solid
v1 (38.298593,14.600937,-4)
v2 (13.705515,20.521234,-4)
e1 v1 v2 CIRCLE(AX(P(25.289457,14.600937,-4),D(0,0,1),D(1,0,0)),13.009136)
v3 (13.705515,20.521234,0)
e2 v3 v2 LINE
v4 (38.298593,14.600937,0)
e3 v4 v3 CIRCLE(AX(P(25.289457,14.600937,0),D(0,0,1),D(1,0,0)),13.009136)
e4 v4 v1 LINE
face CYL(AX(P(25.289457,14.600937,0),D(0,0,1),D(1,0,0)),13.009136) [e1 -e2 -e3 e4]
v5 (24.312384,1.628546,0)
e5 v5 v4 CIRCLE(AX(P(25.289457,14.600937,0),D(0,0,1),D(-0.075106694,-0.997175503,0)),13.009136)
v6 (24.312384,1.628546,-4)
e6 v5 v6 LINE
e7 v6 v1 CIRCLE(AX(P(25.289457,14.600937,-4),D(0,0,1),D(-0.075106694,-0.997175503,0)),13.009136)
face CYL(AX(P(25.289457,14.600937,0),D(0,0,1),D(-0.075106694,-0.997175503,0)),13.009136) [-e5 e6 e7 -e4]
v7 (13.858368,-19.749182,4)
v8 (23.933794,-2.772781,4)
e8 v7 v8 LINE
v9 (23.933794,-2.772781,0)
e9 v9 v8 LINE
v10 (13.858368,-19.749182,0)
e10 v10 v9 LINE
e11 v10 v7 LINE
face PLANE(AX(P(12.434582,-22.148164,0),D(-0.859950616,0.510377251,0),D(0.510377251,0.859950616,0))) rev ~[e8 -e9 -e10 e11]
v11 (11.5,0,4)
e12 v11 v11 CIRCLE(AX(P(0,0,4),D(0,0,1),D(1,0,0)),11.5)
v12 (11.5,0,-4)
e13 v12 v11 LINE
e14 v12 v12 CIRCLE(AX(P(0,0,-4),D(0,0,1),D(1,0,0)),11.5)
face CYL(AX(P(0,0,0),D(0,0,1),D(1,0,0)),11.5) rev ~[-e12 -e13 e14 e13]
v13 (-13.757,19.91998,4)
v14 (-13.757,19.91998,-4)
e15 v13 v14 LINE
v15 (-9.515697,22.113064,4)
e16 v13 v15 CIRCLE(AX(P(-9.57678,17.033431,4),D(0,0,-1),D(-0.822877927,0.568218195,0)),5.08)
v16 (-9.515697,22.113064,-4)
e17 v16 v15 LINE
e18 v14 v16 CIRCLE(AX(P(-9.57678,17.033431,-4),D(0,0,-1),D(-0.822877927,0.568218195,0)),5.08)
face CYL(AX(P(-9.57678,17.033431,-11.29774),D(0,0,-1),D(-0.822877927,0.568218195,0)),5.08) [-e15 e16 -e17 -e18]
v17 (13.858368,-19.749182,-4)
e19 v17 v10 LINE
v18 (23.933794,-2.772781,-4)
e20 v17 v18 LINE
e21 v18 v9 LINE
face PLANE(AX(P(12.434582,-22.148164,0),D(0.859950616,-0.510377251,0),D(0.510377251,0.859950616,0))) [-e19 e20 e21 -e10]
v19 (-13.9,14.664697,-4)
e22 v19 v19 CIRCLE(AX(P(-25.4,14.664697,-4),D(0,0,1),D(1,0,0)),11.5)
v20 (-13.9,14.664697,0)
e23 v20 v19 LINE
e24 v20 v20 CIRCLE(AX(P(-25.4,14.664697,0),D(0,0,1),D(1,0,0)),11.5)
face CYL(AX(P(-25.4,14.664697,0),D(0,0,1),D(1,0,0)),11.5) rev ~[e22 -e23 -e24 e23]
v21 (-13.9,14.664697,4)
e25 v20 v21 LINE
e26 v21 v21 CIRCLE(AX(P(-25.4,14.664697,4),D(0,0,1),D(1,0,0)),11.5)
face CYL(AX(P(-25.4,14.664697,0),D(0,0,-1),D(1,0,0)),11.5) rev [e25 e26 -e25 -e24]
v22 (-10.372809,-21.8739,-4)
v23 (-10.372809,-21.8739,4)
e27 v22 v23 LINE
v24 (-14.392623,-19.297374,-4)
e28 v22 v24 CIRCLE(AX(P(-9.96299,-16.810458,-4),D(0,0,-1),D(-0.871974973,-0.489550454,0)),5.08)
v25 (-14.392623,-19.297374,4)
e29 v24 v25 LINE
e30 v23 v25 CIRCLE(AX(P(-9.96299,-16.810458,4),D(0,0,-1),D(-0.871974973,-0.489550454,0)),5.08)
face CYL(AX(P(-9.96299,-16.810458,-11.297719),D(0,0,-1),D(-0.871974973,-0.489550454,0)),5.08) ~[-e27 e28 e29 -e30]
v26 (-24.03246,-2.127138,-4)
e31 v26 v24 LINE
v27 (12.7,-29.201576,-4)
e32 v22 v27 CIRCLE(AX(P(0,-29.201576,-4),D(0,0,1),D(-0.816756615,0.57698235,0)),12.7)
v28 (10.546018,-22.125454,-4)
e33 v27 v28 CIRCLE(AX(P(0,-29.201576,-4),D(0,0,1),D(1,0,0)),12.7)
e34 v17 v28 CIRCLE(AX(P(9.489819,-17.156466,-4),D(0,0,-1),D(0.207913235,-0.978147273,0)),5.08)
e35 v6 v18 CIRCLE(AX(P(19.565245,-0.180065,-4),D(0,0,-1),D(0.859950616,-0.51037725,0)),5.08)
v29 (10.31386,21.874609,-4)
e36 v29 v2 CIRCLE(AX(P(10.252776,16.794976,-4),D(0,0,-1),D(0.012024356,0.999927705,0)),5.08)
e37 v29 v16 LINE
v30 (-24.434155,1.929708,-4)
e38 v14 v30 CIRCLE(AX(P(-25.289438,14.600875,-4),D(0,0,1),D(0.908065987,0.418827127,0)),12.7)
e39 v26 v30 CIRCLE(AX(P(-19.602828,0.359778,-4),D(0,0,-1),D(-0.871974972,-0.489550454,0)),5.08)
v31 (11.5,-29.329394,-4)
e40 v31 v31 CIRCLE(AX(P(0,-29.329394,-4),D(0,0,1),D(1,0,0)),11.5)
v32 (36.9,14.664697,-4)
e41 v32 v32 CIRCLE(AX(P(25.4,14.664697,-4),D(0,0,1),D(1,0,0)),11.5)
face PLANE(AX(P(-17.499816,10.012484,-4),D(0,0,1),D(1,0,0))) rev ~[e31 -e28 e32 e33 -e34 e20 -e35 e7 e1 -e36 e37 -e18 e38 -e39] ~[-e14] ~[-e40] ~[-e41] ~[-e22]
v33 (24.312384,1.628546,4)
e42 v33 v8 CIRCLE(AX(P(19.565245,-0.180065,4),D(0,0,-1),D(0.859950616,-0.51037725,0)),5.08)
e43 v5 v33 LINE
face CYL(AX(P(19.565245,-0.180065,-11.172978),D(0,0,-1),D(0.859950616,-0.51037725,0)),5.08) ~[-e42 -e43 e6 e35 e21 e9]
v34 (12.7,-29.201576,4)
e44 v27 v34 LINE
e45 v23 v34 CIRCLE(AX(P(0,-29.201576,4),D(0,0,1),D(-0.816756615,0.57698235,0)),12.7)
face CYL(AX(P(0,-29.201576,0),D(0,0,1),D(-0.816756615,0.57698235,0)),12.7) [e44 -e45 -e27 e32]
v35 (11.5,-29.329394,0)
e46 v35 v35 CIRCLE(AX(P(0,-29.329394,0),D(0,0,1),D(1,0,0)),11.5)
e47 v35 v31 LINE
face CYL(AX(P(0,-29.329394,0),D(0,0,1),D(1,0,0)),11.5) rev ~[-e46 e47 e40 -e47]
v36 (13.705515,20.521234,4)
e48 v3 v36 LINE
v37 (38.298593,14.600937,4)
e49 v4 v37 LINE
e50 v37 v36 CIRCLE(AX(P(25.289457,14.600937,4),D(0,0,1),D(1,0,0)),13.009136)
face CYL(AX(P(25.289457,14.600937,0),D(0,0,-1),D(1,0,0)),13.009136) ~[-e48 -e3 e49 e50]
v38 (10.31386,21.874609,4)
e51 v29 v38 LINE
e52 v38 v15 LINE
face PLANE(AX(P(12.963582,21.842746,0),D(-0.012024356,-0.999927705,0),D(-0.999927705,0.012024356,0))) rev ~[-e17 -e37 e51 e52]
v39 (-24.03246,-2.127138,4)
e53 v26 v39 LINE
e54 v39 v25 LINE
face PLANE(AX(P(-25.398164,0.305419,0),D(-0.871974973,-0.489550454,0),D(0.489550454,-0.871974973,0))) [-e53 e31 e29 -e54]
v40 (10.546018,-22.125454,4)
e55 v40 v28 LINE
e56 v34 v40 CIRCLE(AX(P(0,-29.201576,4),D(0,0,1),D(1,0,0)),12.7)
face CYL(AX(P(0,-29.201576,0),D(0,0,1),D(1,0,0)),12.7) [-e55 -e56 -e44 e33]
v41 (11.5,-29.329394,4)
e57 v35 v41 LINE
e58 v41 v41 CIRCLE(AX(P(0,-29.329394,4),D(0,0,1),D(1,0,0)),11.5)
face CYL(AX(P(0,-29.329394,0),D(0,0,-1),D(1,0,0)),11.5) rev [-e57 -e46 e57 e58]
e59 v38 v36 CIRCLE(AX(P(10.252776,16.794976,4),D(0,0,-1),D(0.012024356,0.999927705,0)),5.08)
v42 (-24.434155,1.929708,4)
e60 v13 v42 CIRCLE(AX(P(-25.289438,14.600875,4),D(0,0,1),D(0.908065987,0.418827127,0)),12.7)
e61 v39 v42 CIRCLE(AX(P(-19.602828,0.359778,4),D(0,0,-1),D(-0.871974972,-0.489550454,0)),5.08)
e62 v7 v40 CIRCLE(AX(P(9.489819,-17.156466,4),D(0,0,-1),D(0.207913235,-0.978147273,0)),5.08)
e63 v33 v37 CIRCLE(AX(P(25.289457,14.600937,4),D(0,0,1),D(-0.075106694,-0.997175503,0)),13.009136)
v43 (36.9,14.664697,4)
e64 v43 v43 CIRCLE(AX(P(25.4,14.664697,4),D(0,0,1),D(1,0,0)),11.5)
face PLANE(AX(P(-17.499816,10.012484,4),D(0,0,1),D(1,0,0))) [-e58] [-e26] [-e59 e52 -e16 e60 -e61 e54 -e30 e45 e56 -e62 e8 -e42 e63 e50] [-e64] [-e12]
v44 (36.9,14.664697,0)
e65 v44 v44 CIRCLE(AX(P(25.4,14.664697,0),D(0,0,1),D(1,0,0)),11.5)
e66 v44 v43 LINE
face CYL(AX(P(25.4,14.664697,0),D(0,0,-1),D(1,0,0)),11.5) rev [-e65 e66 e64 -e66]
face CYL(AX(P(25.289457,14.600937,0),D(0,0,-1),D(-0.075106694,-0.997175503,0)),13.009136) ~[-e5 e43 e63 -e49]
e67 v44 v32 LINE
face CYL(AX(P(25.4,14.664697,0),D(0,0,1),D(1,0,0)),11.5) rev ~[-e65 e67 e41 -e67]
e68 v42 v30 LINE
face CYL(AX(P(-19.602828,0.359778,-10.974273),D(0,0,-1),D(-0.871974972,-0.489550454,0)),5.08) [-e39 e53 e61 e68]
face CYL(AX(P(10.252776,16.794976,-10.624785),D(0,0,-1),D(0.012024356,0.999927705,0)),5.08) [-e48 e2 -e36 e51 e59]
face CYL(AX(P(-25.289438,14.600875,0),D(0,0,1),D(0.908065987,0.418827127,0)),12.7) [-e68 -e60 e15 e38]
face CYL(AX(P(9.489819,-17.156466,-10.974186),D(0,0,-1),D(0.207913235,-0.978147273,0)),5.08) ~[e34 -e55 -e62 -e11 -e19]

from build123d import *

# Parameters (mm, degrees)
F2_DEPTH     = 4
F0_R         = 11.5
F3_DEPTH     = 4
F4_T1_DEPTH  = 21.9483713996
F4_T3_DEPTH  = 22.3459559115
F4_T5_DEPTH  = 21.2495705846
F4_T7_DEPTH  = 22.5954800676
F4_T9_DEPTH  = 22.5954384353
F4_T11_DEPTH = 21.948545213


# Not quite as in the source:
# - a fillet or chamfer that OpenCascade refuses, or shapes differently, is made with other operations: its cross-section is extruded or revolved along the edge and cut away or added


with BuildPart() as f2:
    # F1 (on Top) → F2 (new body, symmetric)
    with BuildSketch(Plane.XY):
        with BuildLine():
            ThreePointArc((-24.434154737, 1.9297075548), (-16.0117202716, 5.9282775779), (-12.5894382026, 14.6008752276))
            ThreePointArc((-12.5894382026, 14.6008752276), (-12.8847624083, 17.3237447508), (-13.7570001617, 19.9199797418))
            Line((-13.7570001617, 19.9199797418), (-24.434154737, 1.9297075548))
        make_face()
        with BuildLine():
            ThreePointArc((-13.7570001617, 19.9199797418), (-12.8847624083, 17.3237447508), (-12.5894382026, 14.6008752276))
            ThreePointArc((-12.5894382026, 14.6008752276), (-16.0117202716, 5.9282775779), (-24.434154737, 1.9297075548))
            Line((-24.434154737, 1.9297075548), (-25.3981637022, 0.3054186533))
            Line((-25.3981637022, 0.3054186533), (-12.9635821636, -21.842745649))
            Line((-12.9635821636, -21.842745649), (-10.3728090059, -21.8739002812))
            ThreePointArc((-10.3728090059, -21.8739002812), (0.1527093266, -16.5024942777), (10.54601793, -22.1254538984))
            Line((10.54601793, -22.1254538984), (12.4345815386, -22.1481643023))
            Line((12.4345815386, -22.1481643023), (25.3981637022, -0.3054186533))
            Line((25.3981637022, -0.3054186533), (24.3123835544, 1.6285456733))
            ThreePointArc((24.3123835544, 1.6285456733), (13.9458157922, 8.2323089444), (13.7055148895, 20.5212337137))
            Line((13.7055148895, 20.5212337137), (12.9635821636, 21.842745649))
            Line((12.9635821636, 21.842745649), (-12.4345815386, 22.1481643023))
            Line((-12.4345815386, 22.1481643023), (-13.7570001617, 19.9199797418))
        make_face()
        with BuildLine():
            Line((-24.434154737, 1.9297075548), (-13.7570001617, 19.9199797418))
            ThreePointArc((-13.7570001617, 19.9199797418), (-36.2108110271, 21.0826663094), (-24.434154737, 1.9297075548))
        make_face()
        with BuildLine():
            Line((24.3123835544, 1.6285456733), (13.7055148895, 20.5212337137))
            ThreePointArc((13.7055148895, 20.5212337137), (13.9458157922, 8.2323089444), (24.3123835544, 1.6285456733))
        make_face()
        with BuildLine():
            ThreePointArc((38.29859269, 14.6009373546), (28.3341688507, 27.2487571734), (13.7055148895, 20.5212337137))
            Line((13.7055148895, 20.5212337137), (24.3123835544, 1.6285456733))
            ThreePointArc((24.3123835544, 1.6285456733), (34.136115438, 5.0628952085), (38.29859269, 14.6009373546))
        make_face()
        with BuildLine():
            Line((10.54601793, -22.1254538984), (-10.3728090059, -21.8739002812))
            ThreePointArc((-10.3728090059, -21.8739002812), (-3.8441725784, -41.3058041995), (12.7, -29.2015761288))
            ThreePointArc((12.7, -29.2015761288), (12.1495766945, -25.5032270182), (10.54601793, -22.1254538984))
        make_face()
        with BuildLine():
            ThreePointArc((10.54601793, -22.1254538984), (0.1527093266, -16.5024942777), (-10.3728090059, -21.8739002812))
            Line((-10.3728090059, -21.8739002812), (10.54601793, -22.1254538984))
        make_face()
    extrude(amount=F2_DEPTH, both=True)

    # F0 (on Top) → F3 (cut, symmetric)
    with BuildSketch(Plane.XY):
        with Locations((-25.4, 14.6646968374)):
            Circle(F0_R)
        with Locations((25.4, 14.6646968374)):
            Circle(F0_R)
        with Locations((0, -29.3293936748)):
            Circle(F0_R)
        Circle(F0_R)
    extrude(amount=F3_DEPTH, both=True, mode=Mode.SUBTRACT)

    # F4: fillet of radius 5.08 on 6 edges, made by hand

    # F4_s2 → F4_t1 (cut)
    with BuildSketch(Plane.XY.offset(-10.9741856998)):
        with BuildLine():
            ThreePointArc((10.54601793, -22.1254538984), (12.4510077343, -21.2841478503), (13.8583678275, -19.7491821865))
            Line((13.8583678275, -19.7491821865), (12.4345815386, -22.1481643023))
            Line((12.4345815386, -22.1481643023), (10.54601793, -22.1254538984))
        make_face()
    extrude(amount=F4_T1_DEPTH, mode=Mode.SUBTRACT)

    # F4_s4 → F4_t3 (cut)
    with BuildSketch(Plane.XY.offset(-11.1729779558)):
        with BuildLine():
            ThreePointArc((23.9337937954, -2.7727813782), (24.6265549669, -0.6154246052), (24.3123835544, 1.6285456733))
            Line((24.3123835544, 1.6285456733), (25.3981637022, -0.3054186533))
            Line((25.3981637022, -0.3054186533), (23.9337937954, -2.7727813782))
        make_face()
    extrude(amount=F4_T3_DEPTH, mode=Mode.SUBTRACT)

    # F4_s6 → F4_t5 (cut)
    with BuildSketch(Plane.XY.offset(-10.6247852923)):
        with BuildLine():
            ThreePointArc((10.3138596228, 21.8746091608), (12.1354983401, 21.5132129748), (13.7055148895, 20.5212337137))
            Line((13.7055148895, 20.5212337137), (12.9635821636, 21.842745649))
            Line((12.9635821636, 21.842745649), (10.3138596228, 21.8746091608))
        make_face()
    extrude(amount=F4_T5_DEPTH, mode=Mode.SUBTRACT)

    # F4_s8 → F4_t7 (cut)
    with BuildSketch(Plane.XY.offset(-11.2977400338)):
        with BuildLine():
            ThreePointArc((-13.7570001617, 19.9199797418), (-11.910066672, 21.54587795), (-9.5156965617, 22.1130640513))
            Line((-9.5156965617, 22.1130640513), (-12.4345815386, 22.1481643023))
            Line((-12.4345815386, 22.1481643023), (-13.7570001617, 19.9199797418))
        make_face()
    extrude(amount=F4_T7_DEPTH, mode=Mode.SUBTRACT)

    # F4_s10 → F4_t9 (cut)
    with BuildSketch(Plane.XY.offset(-11.2977192176)):
        with BuildLine():
            ThreePointArc((-14.3926228669, -19.2973742433), (-12.7042844419, -21.0873382025), (-10.3728090059, -21.8739002812))
            Line((-10.3728090059, -21.8739002812), (-12.9635821636, -21.842745649))
            Line((-12.9635821636, -21.842745649), (-14.3926228669, -19.2973742433))
        make_face()
    extrude(amount=F4_T9_DEPTH, mode=Mode.SUBTRACT)

    # F4_s12 → F4_t11 (cut)
    with BuildSketch(Plane.XY.offset(-10.9742726065)):
        with BuildLine():
            ThreePointArc((-24.0324603731, -2.1271378125), (-24.6581063385, -0.1407771898), (-24.434154737, 1.9297075548))
            Line((-24.434154737, 1.9297075548), (-25.3981637022, 0.3054186533))
            Line((-25.3981637022, 0.3054186533), (-24.0324603731, -2.1271378125))
        make_face()
    extrude(amount=F4_T11_DEPTH, mode=Mode.SUBTRACT)


solid = f2.part
